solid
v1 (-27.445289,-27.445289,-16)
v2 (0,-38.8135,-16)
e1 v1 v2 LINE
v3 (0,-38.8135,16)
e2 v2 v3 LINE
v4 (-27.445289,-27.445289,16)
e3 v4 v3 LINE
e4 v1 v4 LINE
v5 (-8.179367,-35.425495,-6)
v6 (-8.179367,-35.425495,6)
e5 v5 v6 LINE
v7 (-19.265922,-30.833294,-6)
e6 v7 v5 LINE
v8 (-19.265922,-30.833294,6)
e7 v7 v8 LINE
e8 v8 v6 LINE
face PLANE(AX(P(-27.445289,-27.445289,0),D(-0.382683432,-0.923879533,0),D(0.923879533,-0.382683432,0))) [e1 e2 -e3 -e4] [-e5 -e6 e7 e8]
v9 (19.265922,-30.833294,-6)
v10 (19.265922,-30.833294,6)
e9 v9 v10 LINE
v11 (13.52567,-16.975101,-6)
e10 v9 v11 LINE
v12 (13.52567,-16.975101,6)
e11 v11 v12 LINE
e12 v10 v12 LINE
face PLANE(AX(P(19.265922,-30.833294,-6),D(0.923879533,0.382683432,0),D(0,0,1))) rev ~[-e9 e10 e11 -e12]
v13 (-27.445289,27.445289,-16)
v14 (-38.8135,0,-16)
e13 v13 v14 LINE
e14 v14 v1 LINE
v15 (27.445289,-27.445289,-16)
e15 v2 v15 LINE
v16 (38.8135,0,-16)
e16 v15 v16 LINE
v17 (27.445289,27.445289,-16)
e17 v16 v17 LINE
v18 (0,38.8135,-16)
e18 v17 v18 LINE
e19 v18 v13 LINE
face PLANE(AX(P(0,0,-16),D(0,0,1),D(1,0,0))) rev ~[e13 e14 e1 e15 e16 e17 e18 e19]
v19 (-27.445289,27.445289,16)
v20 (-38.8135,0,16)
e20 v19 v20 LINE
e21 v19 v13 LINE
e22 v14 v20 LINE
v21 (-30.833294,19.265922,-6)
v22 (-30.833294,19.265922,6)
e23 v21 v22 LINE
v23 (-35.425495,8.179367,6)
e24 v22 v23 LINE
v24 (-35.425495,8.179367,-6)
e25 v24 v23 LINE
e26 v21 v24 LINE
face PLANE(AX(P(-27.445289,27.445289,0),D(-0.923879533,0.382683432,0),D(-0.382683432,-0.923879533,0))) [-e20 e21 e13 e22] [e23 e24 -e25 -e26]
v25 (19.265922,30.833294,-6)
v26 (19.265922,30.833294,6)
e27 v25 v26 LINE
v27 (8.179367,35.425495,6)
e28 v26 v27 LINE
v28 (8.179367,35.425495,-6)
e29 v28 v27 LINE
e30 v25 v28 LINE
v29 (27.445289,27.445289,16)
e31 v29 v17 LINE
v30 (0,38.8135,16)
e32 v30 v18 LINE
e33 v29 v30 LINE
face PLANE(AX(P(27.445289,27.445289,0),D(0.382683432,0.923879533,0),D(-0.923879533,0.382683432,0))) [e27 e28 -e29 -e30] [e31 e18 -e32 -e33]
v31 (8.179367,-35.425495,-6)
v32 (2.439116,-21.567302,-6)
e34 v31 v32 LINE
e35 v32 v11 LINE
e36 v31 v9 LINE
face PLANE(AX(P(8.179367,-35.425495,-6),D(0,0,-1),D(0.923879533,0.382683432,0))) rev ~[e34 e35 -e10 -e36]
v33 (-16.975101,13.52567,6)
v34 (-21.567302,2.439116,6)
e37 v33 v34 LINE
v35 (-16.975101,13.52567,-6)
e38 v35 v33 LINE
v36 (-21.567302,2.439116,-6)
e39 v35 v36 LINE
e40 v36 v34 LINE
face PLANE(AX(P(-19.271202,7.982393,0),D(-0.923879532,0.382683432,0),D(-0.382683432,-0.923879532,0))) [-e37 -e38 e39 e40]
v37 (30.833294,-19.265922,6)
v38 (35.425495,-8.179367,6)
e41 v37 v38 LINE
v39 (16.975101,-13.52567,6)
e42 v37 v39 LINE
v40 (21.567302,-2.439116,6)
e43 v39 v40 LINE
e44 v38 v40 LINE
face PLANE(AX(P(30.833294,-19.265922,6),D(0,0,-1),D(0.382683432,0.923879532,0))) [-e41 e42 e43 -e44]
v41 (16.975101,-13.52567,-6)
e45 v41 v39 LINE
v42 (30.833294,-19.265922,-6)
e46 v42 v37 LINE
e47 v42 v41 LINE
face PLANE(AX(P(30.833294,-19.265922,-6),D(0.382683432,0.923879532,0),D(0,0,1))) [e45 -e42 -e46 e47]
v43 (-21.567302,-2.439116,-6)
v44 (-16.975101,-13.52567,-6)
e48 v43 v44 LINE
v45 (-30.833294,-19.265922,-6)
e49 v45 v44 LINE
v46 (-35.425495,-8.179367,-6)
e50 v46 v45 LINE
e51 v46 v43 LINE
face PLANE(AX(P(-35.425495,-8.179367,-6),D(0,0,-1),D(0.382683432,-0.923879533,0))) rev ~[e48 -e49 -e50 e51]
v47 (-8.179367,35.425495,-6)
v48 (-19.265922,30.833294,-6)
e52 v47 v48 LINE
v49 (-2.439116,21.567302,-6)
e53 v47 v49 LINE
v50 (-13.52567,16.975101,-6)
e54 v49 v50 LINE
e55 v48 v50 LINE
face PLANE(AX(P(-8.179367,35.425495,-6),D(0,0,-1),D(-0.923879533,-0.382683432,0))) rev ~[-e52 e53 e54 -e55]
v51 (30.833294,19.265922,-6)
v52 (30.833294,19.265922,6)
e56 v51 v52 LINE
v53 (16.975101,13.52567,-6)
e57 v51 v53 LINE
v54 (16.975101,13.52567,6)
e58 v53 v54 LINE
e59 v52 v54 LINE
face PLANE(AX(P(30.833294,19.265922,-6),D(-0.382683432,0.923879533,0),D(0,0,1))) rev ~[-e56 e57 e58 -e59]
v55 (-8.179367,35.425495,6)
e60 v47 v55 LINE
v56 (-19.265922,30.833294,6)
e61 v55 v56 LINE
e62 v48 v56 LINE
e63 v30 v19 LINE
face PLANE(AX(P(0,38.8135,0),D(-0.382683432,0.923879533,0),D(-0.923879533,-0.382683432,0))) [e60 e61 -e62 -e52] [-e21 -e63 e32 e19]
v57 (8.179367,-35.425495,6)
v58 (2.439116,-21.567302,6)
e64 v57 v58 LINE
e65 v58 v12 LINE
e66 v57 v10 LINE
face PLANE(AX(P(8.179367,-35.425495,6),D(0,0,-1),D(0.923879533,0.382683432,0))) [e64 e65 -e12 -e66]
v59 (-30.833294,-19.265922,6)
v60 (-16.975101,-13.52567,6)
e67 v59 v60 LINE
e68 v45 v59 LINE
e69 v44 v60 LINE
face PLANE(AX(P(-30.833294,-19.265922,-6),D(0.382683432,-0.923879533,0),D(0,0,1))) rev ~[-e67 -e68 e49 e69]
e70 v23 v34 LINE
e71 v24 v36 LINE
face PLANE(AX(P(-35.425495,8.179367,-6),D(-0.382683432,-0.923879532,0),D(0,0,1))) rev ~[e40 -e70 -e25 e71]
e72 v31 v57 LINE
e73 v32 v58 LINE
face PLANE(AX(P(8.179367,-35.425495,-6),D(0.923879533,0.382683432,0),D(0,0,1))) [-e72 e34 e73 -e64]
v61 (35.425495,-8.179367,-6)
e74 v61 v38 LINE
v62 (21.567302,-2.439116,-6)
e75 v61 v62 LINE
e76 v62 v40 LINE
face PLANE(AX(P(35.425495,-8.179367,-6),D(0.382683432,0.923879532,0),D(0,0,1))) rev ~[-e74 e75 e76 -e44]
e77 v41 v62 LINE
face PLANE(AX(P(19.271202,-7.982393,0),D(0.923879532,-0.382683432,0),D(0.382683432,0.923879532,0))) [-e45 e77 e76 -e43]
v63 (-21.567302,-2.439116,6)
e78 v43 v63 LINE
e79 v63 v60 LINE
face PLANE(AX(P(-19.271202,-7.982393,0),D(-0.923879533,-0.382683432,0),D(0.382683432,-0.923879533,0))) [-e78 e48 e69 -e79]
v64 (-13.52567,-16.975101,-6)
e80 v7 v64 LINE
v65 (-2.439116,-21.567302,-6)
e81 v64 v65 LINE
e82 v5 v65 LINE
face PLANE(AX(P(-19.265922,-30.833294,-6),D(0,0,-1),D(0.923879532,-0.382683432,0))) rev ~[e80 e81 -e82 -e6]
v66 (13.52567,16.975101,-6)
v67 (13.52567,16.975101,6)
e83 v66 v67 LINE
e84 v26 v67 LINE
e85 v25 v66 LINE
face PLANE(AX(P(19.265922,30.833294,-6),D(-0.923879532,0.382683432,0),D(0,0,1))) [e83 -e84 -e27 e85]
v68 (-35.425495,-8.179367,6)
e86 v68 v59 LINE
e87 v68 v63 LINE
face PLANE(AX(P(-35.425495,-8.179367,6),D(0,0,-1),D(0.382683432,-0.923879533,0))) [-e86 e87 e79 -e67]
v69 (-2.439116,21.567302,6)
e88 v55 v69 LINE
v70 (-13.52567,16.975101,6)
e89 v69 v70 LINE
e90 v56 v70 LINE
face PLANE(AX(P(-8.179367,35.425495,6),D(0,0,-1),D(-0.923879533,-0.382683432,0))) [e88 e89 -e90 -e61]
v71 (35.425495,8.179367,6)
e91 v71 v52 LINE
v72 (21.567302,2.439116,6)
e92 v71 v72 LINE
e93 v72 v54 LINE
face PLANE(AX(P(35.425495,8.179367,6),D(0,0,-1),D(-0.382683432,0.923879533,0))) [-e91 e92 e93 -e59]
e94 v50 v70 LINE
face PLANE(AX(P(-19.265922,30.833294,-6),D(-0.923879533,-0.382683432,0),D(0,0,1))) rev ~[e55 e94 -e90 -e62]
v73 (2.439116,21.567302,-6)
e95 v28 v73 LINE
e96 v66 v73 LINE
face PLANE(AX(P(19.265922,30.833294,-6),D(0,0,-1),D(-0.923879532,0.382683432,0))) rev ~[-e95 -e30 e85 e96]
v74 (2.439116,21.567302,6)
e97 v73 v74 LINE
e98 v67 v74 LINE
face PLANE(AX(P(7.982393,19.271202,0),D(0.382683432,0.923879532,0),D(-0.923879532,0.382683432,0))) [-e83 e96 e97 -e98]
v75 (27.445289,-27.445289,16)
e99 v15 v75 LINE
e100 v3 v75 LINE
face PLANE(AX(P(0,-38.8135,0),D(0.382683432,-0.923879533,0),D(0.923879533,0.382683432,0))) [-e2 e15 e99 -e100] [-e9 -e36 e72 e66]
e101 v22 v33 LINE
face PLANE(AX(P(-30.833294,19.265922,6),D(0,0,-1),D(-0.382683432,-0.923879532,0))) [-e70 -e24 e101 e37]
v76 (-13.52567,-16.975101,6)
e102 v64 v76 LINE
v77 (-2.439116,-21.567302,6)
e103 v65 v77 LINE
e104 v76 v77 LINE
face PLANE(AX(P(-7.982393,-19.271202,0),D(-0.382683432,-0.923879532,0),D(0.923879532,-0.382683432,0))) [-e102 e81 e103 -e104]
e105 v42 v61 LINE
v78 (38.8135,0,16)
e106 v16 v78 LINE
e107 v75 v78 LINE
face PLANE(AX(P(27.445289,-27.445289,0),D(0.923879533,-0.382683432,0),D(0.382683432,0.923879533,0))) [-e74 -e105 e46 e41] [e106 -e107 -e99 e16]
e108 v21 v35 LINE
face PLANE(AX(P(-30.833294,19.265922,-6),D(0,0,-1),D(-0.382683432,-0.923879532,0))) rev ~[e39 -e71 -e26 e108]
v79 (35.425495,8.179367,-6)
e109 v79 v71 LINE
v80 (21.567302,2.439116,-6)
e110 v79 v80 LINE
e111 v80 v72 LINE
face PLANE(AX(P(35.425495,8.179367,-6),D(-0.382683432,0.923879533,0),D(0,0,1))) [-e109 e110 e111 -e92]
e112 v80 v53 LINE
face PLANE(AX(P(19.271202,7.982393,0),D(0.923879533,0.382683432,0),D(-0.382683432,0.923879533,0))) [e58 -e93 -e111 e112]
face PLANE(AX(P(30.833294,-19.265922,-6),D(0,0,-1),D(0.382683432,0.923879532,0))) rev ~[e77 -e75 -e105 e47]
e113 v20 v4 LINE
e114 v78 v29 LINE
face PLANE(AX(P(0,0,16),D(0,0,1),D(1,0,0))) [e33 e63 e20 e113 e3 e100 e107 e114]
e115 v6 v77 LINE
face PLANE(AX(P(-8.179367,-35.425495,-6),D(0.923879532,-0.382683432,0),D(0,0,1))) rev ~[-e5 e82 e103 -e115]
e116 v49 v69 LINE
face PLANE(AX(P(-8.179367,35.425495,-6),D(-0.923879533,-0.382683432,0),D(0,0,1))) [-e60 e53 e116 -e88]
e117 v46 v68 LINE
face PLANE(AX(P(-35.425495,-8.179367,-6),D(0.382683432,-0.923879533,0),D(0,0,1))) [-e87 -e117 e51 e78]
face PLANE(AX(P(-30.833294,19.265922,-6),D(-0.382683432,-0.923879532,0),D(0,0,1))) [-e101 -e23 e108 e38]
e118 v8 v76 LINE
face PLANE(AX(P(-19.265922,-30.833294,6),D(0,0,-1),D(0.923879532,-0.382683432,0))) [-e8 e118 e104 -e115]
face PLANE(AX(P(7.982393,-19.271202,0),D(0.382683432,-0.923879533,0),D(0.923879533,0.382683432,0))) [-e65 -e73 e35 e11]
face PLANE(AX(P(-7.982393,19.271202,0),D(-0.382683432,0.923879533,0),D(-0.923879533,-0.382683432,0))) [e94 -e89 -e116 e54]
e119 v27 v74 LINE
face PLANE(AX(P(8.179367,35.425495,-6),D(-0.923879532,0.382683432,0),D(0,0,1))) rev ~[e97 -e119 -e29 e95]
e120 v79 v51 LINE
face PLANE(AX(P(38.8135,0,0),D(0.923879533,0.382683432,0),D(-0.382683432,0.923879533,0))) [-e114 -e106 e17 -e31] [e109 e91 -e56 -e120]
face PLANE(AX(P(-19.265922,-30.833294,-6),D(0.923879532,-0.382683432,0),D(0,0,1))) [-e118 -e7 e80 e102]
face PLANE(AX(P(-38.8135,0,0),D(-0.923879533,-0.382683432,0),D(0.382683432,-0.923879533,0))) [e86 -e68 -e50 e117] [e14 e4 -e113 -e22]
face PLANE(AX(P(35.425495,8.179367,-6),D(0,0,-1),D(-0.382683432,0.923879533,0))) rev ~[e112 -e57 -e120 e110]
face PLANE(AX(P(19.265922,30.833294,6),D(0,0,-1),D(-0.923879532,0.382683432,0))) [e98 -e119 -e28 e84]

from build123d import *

# Parameters (mm, degrees)
F1_DEPTH        = 16
F2_W            = 12
F2_H            = 12
F4_DEPTH        = 15
F4_COPIES_COUNT = 8
F5_W            = 32
F5_H            = 32
F6_DEPTH        = 38.627


# Not quite as in the source:
# - a pattern or mirror of a feature is missing from the dataset's text; its kind, count and spacing are read off the source's solid


with BuildPart() as f1:
    # F0 (on Top) → F1 (new body, symmetric)
    with BuildSketch(Plane.XY):
        Polygon((-27.4452890516, 27.4452890516), (-38.8135, 0), (-27.4452890516, -27.4452890516), (0, -38.8135), (27.4452890516, -27.4452890516), (38.8135, 0), (27.4452890516, 27.4452890516), (0, 38.8135), align=None)
    extrude(amount=F1_DEPTH, both=True)

    # F2 (on face) → F4 (cut)
    with BuildSketch(Plane(origin=(-13.7226445258, -33.1293945258, 0), x_dir=(0.9238795325, -0.3826834324, 0), z_dir=(-0.3826834324, -0.9238795325, 0))):
        Rectangle(F2_W, F2_H)
    f4 = extrude(amount=-F4_DEPTH, mode=Mode.SUBTRACT)

    # F4_copies: F4 ×8 about axis
    f4_copies_axis = Axis((0, 0, 0), (0, 0, 1))
    for i in range(1, F4_COPIES_COUNT):
        add(f4.rotate(f4_copies_axis, i * 360 / F4_COPIES_COUNT), mode=Mode.SUBTRACT)


with BuildPart() as f6:
    # F5 (on Top) → F6 (new body, symmetric)
    with BuildSketch(Plane.XY):
        Rectangle(F5_W, F5_H)
    extrude(amount=F6_DEPTH, both=True)


solid = f1.part
